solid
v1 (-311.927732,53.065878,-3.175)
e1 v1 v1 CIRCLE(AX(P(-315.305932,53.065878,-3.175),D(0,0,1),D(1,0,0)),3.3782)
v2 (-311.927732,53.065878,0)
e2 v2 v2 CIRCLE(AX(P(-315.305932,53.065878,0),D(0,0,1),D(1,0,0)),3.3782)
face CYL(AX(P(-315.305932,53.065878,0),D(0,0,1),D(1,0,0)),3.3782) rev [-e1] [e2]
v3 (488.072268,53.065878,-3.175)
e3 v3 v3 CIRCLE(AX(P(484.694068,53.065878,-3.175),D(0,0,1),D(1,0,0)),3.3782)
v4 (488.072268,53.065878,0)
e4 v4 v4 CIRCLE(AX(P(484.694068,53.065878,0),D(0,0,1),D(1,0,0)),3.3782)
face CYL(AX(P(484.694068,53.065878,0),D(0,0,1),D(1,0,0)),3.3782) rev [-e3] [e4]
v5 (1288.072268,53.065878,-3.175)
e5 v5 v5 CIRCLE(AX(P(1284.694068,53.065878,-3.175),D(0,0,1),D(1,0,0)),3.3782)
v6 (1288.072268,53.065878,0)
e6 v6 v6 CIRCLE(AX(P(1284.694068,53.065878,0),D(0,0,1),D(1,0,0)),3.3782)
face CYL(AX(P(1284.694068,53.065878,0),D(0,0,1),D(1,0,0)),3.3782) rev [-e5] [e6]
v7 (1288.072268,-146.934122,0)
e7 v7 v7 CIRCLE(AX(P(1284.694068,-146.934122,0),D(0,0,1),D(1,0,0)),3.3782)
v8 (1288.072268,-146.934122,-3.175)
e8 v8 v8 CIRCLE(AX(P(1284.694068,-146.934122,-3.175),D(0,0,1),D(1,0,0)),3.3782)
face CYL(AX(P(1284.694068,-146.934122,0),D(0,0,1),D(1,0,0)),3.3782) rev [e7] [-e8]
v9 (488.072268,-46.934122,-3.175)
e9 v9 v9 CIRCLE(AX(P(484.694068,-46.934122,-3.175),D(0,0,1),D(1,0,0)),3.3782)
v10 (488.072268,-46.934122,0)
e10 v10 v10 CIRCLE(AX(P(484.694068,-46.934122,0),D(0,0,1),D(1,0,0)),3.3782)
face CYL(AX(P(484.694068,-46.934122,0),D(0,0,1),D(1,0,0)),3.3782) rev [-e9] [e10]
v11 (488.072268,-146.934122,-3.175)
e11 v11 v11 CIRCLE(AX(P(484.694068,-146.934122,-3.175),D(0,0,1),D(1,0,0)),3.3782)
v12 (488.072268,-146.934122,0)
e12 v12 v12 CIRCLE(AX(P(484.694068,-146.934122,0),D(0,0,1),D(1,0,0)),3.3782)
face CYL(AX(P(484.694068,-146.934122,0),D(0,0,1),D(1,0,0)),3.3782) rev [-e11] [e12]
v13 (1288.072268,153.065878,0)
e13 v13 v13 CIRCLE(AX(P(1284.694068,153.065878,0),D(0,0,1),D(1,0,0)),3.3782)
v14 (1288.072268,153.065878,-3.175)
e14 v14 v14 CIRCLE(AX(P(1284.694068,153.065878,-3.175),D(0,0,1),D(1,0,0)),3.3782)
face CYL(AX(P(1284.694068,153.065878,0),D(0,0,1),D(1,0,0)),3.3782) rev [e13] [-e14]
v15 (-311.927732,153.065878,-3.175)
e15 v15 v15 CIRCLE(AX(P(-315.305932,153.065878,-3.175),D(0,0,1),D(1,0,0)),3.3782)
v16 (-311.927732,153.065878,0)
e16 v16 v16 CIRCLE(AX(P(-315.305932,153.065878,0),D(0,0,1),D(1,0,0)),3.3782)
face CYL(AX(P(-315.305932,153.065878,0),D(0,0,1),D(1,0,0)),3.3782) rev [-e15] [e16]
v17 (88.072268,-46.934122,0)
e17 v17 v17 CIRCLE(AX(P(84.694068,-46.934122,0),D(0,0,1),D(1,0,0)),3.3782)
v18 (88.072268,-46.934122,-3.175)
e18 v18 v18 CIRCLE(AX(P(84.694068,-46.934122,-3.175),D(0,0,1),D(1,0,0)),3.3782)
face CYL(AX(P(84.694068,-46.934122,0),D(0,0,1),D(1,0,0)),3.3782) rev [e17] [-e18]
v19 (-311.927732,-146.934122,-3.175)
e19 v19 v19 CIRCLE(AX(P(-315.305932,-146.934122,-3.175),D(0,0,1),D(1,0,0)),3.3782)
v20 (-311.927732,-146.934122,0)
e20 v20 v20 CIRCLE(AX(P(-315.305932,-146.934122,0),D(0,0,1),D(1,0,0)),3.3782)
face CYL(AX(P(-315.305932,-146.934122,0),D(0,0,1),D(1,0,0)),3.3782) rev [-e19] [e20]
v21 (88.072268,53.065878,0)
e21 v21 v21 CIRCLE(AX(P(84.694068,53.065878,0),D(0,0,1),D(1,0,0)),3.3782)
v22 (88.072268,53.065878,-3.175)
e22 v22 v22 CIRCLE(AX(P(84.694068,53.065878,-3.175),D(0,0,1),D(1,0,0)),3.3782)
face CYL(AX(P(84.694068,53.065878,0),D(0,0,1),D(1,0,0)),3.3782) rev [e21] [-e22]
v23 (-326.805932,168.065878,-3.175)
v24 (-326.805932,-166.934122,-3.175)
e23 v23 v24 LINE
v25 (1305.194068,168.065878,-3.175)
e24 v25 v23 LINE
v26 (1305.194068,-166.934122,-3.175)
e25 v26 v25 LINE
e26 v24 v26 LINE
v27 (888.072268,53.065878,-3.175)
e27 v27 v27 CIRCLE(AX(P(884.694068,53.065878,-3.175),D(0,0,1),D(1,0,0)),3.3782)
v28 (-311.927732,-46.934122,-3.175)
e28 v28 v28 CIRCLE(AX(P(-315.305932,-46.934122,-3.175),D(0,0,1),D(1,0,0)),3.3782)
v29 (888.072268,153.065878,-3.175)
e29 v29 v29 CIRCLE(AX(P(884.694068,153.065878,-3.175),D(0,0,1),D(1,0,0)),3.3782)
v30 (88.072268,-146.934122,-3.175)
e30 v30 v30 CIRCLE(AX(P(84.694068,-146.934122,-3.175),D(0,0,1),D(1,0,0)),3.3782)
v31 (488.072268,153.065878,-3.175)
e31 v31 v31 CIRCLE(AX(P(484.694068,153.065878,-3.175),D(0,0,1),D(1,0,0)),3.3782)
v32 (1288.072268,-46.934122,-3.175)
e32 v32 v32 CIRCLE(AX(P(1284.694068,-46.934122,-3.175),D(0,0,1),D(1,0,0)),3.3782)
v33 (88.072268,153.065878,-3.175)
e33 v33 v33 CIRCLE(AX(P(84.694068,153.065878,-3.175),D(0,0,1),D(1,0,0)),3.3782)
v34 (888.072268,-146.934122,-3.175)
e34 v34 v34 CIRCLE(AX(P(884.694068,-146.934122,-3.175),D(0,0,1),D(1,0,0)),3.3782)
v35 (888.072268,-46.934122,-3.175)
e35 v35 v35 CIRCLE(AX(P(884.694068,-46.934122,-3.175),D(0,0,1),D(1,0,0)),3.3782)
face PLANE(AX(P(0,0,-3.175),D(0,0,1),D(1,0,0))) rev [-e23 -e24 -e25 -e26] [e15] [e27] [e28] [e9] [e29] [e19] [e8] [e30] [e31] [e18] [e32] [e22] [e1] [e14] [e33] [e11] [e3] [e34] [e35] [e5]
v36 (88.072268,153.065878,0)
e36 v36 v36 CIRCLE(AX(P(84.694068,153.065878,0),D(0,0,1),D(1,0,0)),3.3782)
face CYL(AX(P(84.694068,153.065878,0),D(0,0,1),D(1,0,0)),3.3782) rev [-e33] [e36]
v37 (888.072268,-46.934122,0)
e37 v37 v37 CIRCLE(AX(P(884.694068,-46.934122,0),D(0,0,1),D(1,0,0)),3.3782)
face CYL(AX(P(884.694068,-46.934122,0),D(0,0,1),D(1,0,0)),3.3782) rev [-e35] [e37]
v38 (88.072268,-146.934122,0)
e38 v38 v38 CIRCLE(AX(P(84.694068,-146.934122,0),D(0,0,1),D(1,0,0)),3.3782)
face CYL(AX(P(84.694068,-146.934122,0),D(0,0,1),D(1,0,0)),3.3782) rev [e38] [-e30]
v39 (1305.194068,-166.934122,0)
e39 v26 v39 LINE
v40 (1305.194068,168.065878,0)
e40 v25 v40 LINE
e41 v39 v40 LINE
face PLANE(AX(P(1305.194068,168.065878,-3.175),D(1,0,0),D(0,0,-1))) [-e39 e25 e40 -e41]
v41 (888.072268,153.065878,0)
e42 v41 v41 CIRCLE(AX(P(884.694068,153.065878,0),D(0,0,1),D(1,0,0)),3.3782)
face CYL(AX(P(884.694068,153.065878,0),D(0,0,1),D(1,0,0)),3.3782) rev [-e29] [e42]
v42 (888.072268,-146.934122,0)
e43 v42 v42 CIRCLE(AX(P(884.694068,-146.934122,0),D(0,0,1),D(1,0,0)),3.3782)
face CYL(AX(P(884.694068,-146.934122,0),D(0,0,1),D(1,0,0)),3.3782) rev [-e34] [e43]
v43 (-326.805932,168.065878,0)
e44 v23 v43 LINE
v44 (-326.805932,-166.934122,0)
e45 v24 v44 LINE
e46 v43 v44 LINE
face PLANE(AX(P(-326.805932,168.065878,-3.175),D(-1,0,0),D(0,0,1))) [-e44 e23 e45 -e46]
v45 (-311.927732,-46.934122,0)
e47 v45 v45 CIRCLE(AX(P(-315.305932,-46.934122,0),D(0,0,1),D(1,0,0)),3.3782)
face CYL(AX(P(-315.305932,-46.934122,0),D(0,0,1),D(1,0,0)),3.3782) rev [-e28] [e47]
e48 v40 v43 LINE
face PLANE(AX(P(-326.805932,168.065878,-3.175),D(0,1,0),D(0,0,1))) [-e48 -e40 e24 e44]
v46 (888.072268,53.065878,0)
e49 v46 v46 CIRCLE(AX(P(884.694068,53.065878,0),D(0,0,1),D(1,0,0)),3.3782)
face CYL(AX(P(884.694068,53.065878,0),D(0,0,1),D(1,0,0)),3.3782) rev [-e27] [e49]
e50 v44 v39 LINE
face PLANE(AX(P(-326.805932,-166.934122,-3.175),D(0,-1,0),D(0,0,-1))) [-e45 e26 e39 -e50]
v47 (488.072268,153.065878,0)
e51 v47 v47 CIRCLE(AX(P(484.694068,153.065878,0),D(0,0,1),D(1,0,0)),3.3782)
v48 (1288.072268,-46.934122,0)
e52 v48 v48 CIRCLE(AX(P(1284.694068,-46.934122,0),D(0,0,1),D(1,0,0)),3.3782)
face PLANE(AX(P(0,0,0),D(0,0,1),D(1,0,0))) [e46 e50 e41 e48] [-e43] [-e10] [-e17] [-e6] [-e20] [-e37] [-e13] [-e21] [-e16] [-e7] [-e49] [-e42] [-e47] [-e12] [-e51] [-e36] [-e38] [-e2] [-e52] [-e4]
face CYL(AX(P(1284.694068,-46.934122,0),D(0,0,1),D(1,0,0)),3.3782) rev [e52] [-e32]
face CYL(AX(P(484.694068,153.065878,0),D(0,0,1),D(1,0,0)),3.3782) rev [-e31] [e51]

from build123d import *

# Parameters (mm, degrees)
CROQUIS1_W                    = 1632
CROQUIS1_H                    = 335
BRIDA_BASE1_DEPTH             = 3.175
TALADRO_DE_MARGEN_PARA_1_41_D = 6.7564


# Sheet-metal steps are written as plain solids
with BuildPart() as part:
    # Croquis1 → Brida base1 (new body)
    with BuildSketch(Plane.XY):
        with Locations((489.194067834, 0.565878378)):
            Rectangle(CROQUIS1_W, CROQUIS1_H)
    extrude(amount=-BRIDA_BASE1_DEPTH)

    # Taladro de margen para 1/41 (through all)
    with Locations(Plane.XY):
        with Locations((1284.694067834, 153.065878378), (884.694067834, 153.065878378), (484.694067834, 153.065878378), (84.694067834, 153.065878378), (-315.305932166, 153.065878378), (884.694067834, 53.065878378), (484.694067834, 53.065878378), (84.694067834, 53.065878378), (-315.305932166, 53.065878378), (884.694067834, -46.934121622), (484.694067834, -46.934121622), (84.694067834, -46.934121622), (-315.305932166, -46.934121622), (884.694067834, -146.934121622), (484.694067834, -146.934121622), (84.694067834, -146.934121622), (-315.305932166, -146.934121622), (1284.694067834, 53.065878378), (1284.694067834, -46.934121622), (1284.694067834, -146.934121622)):
            Hole(TALADRO_DE_MARGEN_PARA_1_41_D / 2)


solid = part.part
